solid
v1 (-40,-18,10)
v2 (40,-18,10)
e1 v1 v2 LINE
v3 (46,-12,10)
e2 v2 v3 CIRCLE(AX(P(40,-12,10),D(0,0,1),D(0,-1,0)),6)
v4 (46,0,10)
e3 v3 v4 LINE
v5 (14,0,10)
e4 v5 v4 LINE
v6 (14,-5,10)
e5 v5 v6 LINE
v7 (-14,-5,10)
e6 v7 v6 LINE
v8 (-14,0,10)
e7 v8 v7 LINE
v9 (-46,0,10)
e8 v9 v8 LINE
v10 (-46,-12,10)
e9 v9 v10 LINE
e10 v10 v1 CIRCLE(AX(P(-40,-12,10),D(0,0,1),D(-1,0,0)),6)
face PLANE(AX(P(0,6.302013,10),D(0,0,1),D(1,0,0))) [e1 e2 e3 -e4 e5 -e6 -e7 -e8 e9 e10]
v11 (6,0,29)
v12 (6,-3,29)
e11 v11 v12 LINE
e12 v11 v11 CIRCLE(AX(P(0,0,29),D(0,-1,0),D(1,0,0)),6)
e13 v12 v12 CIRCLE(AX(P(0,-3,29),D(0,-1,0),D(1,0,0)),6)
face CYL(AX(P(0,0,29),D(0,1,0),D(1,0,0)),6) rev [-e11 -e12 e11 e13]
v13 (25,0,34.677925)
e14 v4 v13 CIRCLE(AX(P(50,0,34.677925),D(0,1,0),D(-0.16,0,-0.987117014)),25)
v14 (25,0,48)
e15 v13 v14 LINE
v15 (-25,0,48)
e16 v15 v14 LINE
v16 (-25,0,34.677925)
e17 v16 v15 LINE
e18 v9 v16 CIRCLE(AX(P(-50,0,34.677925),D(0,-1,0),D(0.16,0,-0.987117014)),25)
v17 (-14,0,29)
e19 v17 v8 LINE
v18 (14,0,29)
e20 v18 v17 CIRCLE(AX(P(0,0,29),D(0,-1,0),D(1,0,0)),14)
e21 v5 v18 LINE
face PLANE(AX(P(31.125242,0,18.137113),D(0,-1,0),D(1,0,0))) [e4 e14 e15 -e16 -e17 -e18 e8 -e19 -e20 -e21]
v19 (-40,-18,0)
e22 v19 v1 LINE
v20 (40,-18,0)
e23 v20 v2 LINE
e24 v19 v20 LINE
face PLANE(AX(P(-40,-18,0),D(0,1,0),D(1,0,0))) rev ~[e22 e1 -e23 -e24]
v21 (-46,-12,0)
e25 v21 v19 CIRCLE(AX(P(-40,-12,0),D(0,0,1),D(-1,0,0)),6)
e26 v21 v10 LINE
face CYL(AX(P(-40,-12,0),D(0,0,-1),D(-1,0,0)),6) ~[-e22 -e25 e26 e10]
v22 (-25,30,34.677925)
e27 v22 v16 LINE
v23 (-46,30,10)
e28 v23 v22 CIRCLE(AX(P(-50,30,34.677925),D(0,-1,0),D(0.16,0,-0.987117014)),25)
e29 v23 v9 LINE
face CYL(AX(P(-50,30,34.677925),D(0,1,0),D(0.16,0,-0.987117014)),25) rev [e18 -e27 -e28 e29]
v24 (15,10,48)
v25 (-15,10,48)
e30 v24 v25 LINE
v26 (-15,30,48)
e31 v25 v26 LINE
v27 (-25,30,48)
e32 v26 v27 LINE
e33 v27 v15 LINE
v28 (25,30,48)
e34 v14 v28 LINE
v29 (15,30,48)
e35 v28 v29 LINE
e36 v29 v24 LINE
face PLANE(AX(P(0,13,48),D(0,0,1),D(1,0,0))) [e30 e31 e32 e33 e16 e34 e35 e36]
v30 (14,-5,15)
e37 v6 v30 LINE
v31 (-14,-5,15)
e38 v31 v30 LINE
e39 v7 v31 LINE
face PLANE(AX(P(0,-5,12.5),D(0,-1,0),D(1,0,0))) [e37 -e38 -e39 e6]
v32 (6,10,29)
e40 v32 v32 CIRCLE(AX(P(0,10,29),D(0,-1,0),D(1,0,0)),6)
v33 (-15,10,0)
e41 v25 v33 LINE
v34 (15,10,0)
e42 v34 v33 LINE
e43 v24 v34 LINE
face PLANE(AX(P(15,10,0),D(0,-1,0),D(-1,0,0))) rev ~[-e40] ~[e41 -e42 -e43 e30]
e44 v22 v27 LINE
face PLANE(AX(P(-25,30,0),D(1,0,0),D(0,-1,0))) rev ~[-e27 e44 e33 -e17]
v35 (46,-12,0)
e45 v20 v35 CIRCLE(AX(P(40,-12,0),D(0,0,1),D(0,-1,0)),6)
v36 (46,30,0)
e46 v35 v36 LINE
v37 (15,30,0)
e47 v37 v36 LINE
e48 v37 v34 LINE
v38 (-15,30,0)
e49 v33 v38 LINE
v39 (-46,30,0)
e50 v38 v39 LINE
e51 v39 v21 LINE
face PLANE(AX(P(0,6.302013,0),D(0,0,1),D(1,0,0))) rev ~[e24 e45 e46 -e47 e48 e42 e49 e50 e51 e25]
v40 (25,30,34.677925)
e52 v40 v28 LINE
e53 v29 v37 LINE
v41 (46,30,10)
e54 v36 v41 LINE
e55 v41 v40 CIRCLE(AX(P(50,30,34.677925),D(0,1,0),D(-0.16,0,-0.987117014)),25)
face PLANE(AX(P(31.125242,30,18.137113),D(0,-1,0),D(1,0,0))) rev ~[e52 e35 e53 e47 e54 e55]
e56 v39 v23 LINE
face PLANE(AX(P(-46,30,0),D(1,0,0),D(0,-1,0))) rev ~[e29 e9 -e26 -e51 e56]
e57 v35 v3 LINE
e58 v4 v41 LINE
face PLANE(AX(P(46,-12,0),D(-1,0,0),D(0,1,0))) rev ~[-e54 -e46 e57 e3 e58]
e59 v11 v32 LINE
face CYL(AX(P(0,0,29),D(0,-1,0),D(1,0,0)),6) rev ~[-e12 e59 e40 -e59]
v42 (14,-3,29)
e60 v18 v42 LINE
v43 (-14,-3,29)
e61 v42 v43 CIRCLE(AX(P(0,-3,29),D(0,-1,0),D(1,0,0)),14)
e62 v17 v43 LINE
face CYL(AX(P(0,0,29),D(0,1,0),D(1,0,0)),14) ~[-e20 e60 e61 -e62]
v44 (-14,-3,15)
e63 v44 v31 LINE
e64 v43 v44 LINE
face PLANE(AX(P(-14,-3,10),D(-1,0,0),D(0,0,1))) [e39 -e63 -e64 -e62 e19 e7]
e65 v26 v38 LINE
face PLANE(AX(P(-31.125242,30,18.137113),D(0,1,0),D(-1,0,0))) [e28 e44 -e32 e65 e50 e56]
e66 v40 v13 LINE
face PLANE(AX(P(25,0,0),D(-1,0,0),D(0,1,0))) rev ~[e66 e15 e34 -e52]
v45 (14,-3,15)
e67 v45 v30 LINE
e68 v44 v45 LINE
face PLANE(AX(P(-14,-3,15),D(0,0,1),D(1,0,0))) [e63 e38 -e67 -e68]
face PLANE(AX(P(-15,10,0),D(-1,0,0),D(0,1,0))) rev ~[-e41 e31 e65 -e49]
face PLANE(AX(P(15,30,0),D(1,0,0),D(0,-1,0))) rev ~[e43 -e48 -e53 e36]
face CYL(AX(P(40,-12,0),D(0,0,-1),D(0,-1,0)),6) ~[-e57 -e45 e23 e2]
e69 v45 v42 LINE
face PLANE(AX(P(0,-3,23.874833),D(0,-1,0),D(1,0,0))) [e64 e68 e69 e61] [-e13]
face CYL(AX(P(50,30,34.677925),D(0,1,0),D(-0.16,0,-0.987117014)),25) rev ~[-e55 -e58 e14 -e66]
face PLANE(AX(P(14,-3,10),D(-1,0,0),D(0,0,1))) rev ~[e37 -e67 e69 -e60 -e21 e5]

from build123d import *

# Parameters (mm, degrees)
F1_DEPTH    = 10
F3_DEPTH    = 48
F4_T1_DEPTH = 30
F5_T1_DEPTH = 30
F6_R        = 6
F7_DEPTH    = 3
F8_W        = 28
F8_H        = 5
F9_DEPTH    = 2
F10_DEPTH   = 25


# Not quite as in the source:
# - a fillet or chamfer that OpenCascade refuses, or shapes differently, is made with other operations: its cross-section is extruded or revolved along the edge and cut away or added


with BuildPart() as f1:
    # F0 (on Top) → F1 (new body)
    with BuildSketch(Plane.XY):
        with BuildLine():
            Line((-15, 30), (-46, 30))
            Line((-46, 30), (-46, -12))
            ThreePointArc((-46, -12), (-44.2426406871, -16.2426406871), (-40, -18))
            Line((-40, -18), (40, -18))
            ThreePointArc((40, -18), (44.2426406871, -16.2426406871), (46, -12))
            Line((46, -12), (46, 30))
            Line((46, 30), (15, 30))
            Line((15, 30), (15, 10))
            Line((15, 10), (-15, 10))
            Line((-15, 10), (-15, 30))
        make_face()
    extrude(amount=F1_DEPTH)

    # F2 (on Top) → F3 (join)
    with BuildSketch(Plane.XY):
        Polygon((-15, 30), (-25, 30), (-25, 0), (25, 0), (25, 30), (15, 30), (15, 10), (-15, 10), align=None)
    extrude(amount=F3_DEPTH)

    # F4: fillet of radius 25 on 1 edges, made by hand

    # F4_s2 → F4_t1 (join)
    with BuildSketch(Plane.XZ.offset(-30)):
        with BuildLine():
            ThreePointArc((-46, 10), (-30.9605672353, 18.4760736125), (-25, 34.6779253585))
            Line((-25, 34.6779253585), (-25, 10))
            Line((-25, 10), (-46, 10))
        make_face()
    extrude(amount=F4_T1_DEPTH)

    # F5: fillet of radius 25 on 1 edges, made by hand

    # F5_s2 → F5_t1 (join)
    with BuildSketch(Plane.XZ.offset(-30)):
        with BuildLine():
            ThreePointArc((46, 10), (30.9605672353, 18.4760736125), (25, 34.6779253585))
            Line((25, 34.6779253585), (25, 10))
            Line((25, 10), (46, 10))
        make_face()
    extrude(amount=F5_T1_DEPTH)

    # F6 (on face) → F7 (join)
    with BuildSketch(Plane.XZ):
        with BuildLine():
            Line((14, 10), (14, 29))
            ThreePointArc((14, 29), (0, 43), (-14, 29))
            Line((-14, 29), (-14, 10))
            Line((-14, 10), (14, 10))
        make_face()
        with Locations((0, 29)):
            Circle(F6_R, mode=Mode.SUBTRACT)
    extrude(amount=F7_DEPTH)

    # F8 (on face) → F9 (join)
    with BuildSketch(Plane.XZ.offset(3)):
        with Locations((0, 12.5)):
            Rectangle(F8_W, F8_H)
    extrude(amount=F9_DEPTH)

    # F10 (cut): a face of the model
    f10_faces = [f1.faces().sort_by_distance(p)[0] for p in [
        (0, 0, 29),
    ]]
    extrude(f10_faces, amount=-F10_DEPTH, mode=Mode.SUBTRACT)


solid = f1.part
